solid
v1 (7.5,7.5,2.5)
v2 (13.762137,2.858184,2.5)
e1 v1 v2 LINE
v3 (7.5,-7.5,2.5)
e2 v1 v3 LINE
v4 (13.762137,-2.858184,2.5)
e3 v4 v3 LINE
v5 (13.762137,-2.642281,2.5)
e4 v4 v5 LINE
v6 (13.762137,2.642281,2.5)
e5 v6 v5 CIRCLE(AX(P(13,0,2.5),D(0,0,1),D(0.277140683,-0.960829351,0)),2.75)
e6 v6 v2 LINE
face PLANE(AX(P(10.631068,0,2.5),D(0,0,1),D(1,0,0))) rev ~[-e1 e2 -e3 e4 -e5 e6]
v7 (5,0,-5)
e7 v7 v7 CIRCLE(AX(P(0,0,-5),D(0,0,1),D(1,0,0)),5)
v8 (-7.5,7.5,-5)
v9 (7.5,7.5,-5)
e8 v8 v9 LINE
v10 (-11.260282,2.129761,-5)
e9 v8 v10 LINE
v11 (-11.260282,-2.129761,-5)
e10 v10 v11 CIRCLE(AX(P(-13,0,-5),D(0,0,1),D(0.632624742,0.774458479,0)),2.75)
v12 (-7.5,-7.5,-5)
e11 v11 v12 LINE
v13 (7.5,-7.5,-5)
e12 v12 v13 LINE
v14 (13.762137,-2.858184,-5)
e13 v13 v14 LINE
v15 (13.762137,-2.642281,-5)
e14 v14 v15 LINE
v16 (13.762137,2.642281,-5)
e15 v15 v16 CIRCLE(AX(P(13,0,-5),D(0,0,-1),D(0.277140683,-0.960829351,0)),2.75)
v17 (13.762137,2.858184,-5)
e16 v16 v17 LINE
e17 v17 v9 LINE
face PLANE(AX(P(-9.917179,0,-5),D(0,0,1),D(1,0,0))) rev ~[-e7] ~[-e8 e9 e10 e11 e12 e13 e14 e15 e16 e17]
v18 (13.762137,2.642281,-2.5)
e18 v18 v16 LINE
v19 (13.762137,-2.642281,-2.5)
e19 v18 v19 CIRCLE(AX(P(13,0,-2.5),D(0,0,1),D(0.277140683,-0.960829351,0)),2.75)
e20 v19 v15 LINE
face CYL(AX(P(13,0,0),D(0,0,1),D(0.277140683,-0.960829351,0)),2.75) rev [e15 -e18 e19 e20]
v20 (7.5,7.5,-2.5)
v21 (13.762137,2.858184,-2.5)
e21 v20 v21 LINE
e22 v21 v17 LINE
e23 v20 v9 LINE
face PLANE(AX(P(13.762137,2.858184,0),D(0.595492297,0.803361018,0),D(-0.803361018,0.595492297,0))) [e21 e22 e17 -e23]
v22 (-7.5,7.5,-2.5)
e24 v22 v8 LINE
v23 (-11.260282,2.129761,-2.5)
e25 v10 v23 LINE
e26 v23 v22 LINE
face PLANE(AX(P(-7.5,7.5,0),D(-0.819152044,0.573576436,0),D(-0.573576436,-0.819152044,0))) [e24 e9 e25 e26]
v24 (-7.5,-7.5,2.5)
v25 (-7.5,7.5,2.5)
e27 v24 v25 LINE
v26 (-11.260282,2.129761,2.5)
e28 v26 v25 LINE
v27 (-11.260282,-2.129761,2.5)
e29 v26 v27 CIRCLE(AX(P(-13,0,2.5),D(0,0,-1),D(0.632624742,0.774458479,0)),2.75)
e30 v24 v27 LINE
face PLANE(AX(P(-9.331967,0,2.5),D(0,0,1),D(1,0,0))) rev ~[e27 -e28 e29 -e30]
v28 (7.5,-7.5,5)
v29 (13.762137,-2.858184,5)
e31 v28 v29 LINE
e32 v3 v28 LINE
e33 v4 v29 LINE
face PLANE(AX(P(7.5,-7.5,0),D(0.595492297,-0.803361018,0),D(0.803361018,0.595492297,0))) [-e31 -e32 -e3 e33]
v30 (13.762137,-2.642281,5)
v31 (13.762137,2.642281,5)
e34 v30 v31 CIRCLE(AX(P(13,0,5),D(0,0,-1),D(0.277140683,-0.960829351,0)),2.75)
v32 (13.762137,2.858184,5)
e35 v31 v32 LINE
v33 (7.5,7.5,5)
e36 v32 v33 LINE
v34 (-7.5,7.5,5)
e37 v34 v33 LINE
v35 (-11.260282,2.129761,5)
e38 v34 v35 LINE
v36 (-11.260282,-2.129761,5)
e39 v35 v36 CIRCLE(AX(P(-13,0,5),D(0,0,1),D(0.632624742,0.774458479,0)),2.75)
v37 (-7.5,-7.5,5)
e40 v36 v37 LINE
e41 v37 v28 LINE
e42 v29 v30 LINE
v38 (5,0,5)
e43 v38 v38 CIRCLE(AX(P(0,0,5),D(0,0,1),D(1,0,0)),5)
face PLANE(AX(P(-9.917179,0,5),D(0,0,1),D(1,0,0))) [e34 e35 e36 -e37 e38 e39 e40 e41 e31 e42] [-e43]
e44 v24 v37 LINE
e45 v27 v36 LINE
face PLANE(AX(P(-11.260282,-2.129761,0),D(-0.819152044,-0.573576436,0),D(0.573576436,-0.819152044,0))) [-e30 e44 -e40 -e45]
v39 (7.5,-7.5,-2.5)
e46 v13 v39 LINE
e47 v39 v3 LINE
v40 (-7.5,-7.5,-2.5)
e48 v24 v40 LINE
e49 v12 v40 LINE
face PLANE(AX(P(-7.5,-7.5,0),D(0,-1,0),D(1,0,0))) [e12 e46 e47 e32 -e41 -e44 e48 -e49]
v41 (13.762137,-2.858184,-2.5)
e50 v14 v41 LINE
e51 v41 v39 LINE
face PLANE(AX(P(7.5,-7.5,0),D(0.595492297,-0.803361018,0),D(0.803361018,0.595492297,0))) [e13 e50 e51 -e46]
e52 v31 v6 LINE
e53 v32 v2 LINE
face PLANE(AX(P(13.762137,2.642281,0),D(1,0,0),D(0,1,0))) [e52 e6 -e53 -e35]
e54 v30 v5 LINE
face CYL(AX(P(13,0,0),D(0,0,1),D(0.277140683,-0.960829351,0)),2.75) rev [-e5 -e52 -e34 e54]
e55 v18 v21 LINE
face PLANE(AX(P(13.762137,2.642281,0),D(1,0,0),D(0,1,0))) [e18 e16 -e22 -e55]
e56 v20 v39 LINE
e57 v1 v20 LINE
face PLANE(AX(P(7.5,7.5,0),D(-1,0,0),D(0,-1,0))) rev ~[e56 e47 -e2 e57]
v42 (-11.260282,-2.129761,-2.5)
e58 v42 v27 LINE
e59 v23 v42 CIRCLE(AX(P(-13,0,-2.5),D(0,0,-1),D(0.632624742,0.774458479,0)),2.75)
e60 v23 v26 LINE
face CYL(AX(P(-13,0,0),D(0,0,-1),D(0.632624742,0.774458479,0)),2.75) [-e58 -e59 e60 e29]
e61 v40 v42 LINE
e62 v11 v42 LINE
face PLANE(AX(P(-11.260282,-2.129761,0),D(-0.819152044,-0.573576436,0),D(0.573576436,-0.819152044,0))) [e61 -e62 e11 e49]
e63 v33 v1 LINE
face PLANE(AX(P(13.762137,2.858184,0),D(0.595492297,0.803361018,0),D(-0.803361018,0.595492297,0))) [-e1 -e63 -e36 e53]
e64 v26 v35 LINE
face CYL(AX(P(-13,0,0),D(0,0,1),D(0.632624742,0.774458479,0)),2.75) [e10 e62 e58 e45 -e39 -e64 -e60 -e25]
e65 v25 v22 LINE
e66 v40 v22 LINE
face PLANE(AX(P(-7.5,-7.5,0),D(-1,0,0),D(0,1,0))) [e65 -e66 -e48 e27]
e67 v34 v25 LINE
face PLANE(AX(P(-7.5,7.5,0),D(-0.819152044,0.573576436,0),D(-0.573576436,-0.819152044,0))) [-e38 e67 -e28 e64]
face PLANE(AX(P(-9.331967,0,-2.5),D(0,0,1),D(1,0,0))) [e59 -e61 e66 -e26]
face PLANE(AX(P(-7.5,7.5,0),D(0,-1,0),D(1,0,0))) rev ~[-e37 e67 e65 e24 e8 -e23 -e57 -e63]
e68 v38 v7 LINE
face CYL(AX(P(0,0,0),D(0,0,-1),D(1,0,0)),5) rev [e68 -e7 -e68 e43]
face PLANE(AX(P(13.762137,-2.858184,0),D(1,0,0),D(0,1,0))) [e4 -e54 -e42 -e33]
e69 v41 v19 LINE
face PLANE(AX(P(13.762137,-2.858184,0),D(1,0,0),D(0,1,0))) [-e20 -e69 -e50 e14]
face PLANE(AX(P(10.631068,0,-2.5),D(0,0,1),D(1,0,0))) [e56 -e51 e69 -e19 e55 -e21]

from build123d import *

# Parameters (mm, degrees)
F0_W     = 15
F0_H     = 15
F0_R     = 5
F1_DEPTH = 5
F3_DEPTH = 5
F5_DEPTH = 5
F7_DEPTH = 2.5


with BuildPart() as f1:
    # F0 (on Top) → F1 (new body, symmetric)
    with BuildSketch(Plane.XY):
        Rectangle(F0_W, F0_H)
        Circle(F0_R, mode=Mode.SUBTRACT)
    extrude(amount=F1_DEPTH, both=True)

    # F2 (on Top) → F3 (join, symmetric)
    with BuildSketch(Plane.XY):
        with BuildLine():
            Line((13.7621368783, 2.8581836929), (7.5, 7.5))
            Line((7.5, 7.5), (7.5, -7.5))
            Line((7.5, -7.5), (13.7621368783, -2.8581836929))
            Line((13.7621368783, -2.8581836929), (13.7621368783, -2.6422807153))
            ThreePointArc((13.7621368783, -2.6422807153), (10.25, 0), (13.7621368783, 2.6422807153))
            Line((13.7621368783, 2.6422807153), (13.7621368783, 2.8581836929))
        make_face()
    extrude(amount=F3_DEPTH, both=True)

    # F4 (on Top) → F5 (join, symmetric)
    with BuildSketch(Plane.XY):
        with BuildLine():
            Line((-7.5, 7.5), (-11.2602819583, 2.1297608165))
            ThreePointArc((-11.2602819583, 2.1297608165), (-15.75, 0), (-11.2602819583, -2.1297608165))
            Line((-11.2602819583, -2.1297608165), (-7.5, -7.5))
            Line((-7.5, -7.5), (-7.5, 7.5))
        make_face()
    extrude(amount=F5_DEPTH, both=True)

    # F6 (on Top) → F7 (cut, symmetric)
    with BuildSketch(Plane.XY):
        with BuildLine():
            Line((-7.5, -2.1297608165), (-7.5, 2.1297608165))
            Line((-7.5, 2.1297608165), (-7.5, 7.5))
            Line((-7.5, 7.5), (-11.2602819583, 7.5))
            Line((-11.2602819583, 7.5), (-11.2602819583, 2.1297608165))
            ThreePointArc((-11.2602819583, 2.1297608165), (-10.25, 0), (-11.2602819583, -2.1297608165))
            Line((-11.2602819583, -2.1297608165), (-11.2602819583, -7.5))
            Line((-11.2602819583, -7.5), (-7.5, -7.5))
            Line((-7.5, -7.5), (-7.5, -2.1297608165))
        make_face()
        Polygon((7.5, 7.5), (7.5, 2.8581836929), (7.5, -2.8581836929), (7.5, -7.5), (13.7621368783, -7.5), (13.7621368783, -2.8581836929), (13.7621368783, 2.8581836929), (13.7621368783, 7.5), align=None)
    extrude(amount=F7_DEPTH, both=True, mode=Mode.SUBTRACT)


solid = f1.part
